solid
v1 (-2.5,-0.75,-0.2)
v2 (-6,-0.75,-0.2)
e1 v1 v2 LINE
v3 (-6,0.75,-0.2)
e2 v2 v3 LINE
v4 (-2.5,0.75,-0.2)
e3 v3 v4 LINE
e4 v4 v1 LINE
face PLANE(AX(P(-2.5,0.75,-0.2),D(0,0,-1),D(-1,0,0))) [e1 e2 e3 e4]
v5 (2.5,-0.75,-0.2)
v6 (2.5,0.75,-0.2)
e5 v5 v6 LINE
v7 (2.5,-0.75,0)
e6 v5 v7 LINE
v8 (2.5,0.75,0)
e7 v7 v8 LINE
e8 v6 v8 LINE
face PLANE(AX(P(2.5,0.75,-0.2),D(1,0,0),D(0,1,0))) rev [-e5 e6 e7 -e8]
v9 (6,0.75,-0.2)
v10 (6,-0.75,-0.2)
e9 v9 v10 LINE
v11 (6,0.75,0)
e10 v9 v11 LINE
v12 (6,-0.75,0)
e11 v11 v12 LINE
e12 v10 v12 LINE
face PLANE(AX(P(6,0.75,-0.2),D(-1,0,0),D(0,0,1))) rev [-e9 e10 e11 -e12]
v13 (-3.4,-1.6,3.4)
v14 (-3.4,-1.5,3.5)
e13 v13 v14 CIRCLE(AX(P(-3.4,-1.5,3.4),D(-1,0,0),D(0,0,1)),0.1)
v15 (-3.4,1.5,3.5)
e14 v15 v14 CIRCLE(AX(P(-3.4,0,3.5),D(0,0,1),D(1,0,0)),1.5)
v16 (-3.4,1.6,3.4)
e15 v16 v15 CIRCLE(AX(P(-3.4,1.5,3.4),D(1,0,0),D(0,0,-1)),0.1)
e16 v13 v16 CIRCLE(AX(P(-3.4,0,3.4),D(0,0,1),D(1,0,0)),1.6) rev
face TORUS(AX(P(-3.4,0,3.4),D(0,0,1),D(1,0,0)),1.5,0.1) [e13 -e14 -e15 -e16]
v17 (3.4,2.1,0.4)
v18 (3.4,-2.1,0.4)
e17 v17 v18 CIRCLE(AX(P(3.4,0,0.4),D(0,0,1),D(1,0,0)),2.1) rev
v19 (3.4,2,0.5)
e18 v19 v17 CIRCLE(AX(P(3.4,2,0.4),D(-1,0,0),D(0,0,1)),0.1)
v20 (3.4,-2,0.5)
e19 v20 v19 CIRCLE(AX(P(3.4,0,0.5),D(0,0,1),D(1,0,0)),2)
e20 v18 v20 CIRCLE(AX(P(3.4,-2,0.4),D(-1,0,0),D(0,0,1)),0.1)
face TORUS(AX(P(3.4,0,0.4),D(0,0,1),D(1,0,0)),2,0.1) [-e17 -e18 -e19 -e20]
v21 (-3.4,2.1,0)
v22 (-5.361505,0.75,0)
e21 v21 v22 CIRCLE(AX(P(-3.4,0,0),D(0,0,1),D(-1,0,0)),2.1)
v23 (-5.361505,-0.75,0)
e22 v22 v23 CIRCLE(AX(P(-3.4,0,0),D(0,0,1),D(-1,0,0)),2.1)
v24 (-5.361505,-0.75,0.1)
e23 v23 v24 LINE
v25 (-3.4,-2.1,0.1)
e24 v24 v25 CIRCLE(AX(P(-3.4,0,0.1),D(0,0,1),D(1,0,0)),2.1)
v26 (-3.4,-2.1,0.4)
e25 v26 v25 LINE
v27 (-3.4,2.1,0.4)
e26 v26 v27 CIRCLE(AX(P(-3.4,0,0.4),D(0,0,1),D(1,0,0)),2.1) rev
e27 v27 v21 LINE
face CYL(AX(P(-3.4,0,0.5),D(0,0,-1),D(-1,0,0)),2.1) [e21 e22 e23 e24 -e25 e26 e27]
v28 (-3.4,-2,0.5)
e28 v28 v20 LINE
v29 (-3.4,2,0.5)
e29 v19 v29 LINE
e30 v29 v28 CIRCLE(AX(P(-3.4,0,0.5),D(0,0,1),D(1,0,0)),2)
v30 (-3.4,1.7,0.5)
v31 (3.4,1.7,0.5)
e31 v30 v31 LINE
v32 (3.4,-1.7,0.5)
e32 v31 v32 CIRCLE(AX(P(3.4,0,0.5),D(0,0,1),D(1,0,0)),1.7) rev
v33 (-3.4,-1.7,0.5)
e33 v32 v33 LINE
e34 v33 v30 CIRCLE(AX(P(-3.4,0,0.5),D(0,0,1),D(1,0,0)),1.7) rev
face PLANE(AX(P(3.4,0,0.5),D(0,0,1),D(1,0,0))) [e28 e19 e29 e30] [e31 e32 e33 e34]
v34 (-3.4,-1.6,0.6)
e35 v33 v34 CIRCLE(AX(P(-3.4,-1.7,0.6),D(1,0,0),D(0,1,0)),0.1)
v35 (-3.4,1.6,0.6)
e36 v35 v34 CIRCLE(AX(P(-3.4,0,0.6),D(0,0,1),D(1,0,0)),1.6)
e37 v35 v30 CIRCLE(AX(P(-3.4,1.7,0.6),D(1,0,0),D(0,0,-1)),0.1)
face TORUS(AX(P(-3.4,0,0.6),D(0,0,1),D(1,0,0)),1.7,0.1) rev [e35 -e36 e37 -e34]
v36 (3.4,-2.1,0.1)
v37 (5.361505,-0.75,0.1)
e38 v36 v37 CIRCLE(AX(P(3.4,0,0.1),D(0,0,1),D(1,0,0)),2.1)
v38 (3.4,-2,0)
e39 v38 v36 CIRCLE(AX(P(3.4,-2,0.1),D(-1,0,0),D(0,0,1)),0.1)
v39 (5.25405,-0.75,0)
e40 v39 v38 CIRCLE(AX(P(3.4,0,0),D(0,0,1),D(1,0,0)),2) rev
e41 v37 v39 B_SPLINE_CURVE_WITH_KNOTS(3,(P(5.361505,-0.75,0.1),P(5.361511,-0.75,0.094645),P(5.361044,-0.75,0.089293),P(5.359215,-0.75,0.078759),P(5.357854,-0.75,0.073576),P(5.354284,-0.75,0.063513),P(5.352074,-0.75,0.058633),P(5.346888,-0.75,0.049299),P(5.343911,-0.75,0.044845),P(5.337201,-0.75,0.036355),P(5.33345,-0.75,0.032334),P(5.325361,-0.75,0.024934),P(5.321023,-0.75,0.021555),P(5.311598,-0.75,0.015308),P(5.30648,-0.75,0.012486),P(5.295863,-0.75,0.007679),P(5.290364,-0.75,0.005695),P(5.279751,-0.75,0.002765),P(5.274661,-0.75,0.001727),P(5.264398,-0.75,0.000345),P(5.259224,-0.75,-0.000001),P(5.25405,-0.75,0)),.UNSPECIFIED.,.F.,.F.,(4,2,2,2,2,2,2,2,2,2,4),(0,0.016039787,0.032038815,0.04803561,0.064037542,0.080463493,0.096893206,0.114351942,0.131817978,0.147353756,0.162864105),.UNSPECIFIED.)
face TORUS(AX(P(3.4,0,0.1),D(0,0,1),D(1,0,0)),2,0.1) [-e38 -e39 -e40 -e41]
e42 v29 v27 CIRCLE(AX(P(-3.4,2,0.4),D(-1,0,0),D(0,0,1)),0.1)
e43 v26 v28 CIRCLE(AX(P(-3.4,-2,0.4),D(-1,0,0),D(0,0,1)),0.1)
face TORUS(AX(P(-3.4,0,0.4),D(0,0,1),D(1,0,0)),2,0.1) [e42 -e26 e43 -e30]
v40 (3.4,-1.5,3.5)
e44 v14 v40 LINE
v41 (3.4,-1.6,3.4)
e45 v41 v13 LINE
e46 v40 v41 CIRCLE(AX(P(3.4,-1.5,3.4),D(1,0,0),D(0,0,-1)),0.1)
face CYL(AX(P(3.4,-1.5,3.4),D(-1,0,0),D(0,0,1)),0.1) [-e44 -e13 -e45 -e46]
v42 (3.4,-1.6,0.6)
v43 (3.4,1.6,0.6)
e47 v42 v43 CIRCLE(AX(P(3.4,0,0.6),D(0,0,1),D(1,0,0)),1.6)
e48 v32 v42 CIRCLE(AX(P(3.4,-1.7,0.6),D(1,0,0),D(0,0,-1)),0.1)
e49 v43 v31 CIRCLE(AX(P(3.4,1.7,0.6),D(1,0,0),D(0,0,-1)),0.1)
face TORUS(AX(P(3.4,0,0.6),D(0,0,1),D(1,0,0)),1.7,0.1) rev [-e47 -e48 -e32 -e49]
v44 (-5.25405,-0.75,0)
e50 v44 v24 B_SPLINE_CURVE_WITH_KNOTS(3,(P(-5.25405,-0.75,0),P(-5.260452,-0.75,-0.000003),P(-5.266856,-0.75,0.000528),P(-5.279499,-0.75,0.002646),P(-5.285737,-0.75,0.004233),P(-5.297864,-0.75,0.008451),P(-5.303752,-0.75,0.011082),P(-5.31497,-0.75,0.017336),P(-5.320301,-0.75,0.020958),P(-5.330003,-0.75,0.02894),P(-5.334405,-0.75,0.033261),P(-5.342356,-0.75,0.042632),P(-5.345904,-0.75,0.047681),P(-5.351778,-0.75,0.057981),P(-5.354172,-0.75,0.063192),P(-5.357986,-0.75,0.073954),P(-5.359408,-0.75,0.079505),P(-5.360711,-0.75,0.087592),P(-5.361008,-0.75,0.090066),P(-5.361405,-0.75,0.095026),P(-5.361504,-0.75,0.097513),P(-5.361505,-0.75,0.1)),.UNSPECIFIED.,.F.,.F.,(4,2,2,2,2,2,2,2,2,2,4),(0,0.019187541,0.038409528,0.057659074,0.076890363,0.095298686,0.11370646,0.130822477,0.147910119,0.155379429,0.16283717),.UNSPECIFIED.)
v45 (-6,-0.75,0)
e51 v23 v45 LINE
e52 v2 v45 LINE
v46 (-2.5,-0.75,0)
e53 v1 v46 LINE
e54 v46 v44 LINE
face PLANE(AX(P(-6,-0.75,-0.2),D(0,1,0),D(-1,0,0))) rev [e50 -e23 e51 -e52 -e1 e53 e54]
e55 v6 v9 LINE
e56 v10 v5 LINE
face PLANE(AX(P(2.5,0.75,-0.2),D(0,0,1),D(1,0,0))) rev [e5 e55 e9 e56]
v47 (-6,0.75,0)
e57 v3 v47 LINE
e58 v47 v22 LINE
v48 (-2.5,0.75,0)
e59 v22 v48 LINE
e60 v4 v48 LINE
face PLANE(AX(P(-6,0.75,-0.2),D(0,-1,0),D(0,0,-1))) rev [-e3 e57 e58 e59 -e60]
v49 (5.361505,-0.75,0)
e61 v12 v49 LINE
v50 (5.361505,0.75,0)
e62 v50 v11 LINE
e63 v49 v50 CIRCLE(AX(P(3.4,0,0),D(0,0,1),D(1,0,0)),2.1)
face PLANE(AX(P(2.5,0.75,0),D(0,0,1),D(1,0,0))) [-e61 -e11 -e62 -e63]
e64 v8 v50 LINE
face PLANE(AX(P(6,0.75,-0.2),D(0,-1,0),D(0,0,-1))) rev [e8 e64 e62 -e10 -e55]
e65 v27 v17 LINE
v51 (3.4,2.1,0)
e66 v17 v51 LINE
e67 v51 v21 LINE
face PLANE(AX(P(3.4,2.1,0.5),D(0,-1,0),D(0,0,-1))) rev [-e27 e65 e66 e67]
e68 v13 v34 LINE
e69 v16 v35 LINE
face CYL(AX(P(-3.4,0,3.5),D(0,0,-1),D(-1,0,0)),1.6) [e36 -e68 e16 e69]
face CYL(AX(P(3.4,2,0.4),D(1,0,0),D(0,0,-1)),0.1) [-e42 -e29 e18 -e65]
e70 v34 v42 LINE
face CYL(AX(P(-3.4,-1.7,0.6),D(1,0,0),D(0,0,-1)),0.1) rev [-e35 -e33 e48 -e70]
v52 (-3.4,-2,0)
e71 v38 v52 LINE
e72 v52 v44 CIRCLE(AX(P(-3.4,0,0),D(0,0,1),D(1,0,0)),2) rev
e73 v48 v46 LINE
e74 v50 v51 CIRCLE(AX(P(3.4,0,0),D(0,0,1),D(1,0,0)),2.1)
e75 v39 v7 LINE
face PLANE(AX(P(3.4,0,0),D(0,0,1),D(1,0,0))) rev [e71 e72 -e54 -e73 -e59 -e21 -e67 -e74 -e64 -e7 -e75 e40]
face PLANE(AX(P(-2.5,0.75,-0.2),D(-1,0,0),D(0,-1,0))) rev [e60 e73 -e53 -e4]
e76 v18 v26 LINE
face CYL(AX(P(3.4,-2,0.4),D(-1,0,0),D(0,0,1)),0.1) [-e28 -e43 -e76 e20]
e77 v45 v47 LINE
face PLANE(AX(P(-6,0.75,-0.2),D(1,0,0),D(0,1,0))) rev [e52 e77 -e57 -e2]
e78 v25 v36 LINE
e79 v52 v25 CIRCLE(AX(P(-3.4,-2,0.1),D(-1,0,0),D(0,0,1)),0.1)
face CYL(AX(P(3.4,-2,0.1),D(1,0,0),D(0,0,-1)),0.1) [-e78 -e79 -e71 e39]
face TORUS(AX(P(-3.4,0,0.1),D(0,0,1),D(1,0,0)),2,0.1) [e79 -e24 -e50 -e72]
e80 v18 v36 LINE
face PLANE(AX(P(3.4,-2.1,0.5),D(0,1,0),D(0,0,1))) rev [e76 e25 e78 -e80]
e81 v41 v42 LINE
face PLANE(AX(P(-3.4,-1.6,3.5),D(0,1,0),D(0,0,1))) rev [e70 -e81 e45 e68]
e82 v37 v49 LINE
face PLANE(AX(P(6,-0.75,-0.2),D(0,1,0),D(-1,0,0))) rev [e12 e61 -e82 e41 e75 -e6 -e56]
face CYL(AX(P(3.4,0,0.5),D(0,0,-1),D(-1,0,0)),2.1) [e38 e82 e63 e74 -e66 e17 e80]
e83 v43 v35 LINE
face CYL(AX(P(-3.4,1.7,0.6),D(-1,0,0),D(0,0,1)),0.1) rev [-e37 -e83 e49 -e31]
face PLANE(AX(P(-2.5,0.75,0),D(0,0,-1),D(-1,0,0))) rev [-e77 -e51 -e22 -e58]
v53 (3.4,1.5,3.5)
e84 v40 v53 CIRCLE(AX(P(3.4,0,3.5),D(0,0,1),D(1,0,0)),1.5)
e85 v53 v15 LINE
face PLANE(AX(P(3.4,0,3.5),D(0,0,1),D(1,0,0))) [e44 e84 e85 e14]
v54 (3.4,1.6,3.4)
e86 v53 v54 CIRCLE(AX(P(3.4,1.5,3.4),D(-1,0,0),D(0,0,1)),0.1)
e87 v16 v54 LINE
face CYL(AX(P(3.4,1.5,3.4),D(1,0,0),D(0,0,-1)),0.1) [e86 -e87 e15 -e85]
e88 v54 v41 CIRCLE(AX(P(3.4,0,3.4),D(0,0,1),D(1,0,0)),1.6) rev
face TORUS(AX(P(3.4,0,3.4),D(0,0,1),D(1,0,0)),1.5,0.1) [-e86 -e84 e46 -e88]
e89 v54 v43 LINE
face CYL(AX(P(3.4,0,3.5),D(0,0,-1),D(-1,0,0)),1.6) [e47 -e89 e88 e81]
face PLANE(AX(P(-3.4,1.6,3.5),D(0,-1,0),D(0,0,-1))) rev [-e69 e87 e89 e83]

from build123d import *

# Parameters (mm, degrees)
EXTRUDE_1_DEPTH = 0.5
EXTRUDE_2_DEPTH = 3
SKETCH_3_W      = 3.5
SKETCH_3_H      = 1.5
EXTRUDE_3_DEPTH = 0.2
FILLET_1_R      = 0.1


with BuildPart() as part:
    # 草图1 → 凸台-拉伸1 (new body)
    with BuildSketch(Plane.XY):
        with BuildLine():
            Line((3.4, 2.1), (-3.4, 2.1))
            ThreePointArc((-3.4, 2.1), (-5.5, 0), (-3.4, -2.1))
            Line((-3.4, -2.1), (3.4, -2.1))
            ThreePointArc((3.4, -2.1), (5.5, 0), (3.4, 2.1))
        make_face()
    extrude(amount=EXTRUDE_1_DEPTH)

    # 草图2 → 凸台-拉伸2 (add)
    with BuildSketch(Plane.XY.offset(0.5)):
        with BuildLine():
            Line((-3.4, 1.6), (3.4, 1.6))
            ThreePointArc((3.4, 1.6), (5, 0), (3.4, -1.6))
            Line((3.4, -1.6), (-3.4, -1.6))
            ThreePointArc((-3.4, -1.6), (-5, 0), (-3.4, 1.6))
        make_face()
    extrude(amount=EXTRUDE_2_DEPTH)

    # 草图3 → 凸台-拉伸3 (add)
    with BuildSketch(Plane(origin=(0, 0, 0), x_dir=(-1, 0, 0), z_dir=(0, 0, -1))):
        with Locations((-4.25, 0)):
            Rectangle(SKETCH_3_W, SKETCH_3_H)
        with Locations((4.25, 0)):
            Rectangle(SKETCH_3_W, SKETCH_3_H)
    extrude(amount=EXTRUDE_3_DEPTH)

    # 圆角1
    # the kernel refuses this fillet: 0.1 mm, written as the material it adds along each edge
    with BuildSketch(Plane(origin=(3.4, 0, 0.5), x_dir=(0, 1, 0), z_dir=(-1, 0, 0))) as fillet_1_piece_1:
        with BuildLine():
            CenterArc((1.6 + FILLET_1_R, -FILLET_1_R), FILLET_1_R, 90, 90)
            Line((1.6, -FILLET_1_R), (1.6, 0))
            Line((1.6, 0), (1.6 + FILLET_1_R, 0))
        make_face()
    revolve(axis=Axis((3.4, 0, 0.5), (0, 0, -1)), revolution_arc=180)
    with BuildSketch(Plane(origin=(-3.4, 1.6, 0.5), x_dir=(0, 1, 0), z_dir=(1, 0, 0)), Plane(origin=(3.4, -1.6, 0.5), x_dir=(0, -1, 0), z_dir=(-1, 0, 0))) as fillet_1_piece_2:
        with BuildLine():
            CenterArc((FILLET_1_R, FILLET_1_R), FILLET_1_R, 180, 90)
            Line((0, FILLET_1_R), (0, 0))
            Line((0, 0), (FILLET_1_R, 0))
        make_face()
    extrude(amount=6.8)
    with BuildSketch(Plane(origin=(-3.4, 0, 0.5), x_dir=(0, -1, 0), z_dir=(1, 0, 0))) as fillet_1_piece_3:
        with BuildLine():
            CenterArc((1.6 + FILLET_1_R, -FILLET_1_R), FILLET_1_R, 90, 90)
            Line((1.6, -FILLET_1_R), (1.6, 0))
            Line((1.6, 0), (1.6 + FILLET_1_R, 0))
        make_face()
    revolve(axis=Axis((-3.4, 0, 0.5), (0, 0, -1)), revolution_arc=180)
    # the kernel refuses this fillet: 0.1 mm, written as the material it takes off along each edge
    with BuildSketch(Plane(origin=(-3.4, 0, 0.5), x_dir=(0, 1, 0), z_dir=(1, 0, 0))) as fillet_1_2_piece_1:
        with BuildLine():
            CenterArc((2.1 - FILLET_1_R, -FILLET_1_R), FILLET_1_R, 0, 90)
            Line((2.1 - FILLET_1_R, 0), (2.1, 0))
            Line((2.1, 0), (2.1, -FILLET_1_R))
        make_face()
    revolve(axis=Axis((-3.4, 0, 0.5), (0, 0, 1)), revolution_arc=180, mode=Mode.SUBTRACT)
    with BuildSketch(Plane(origin=(-3.4, -2.1, 0.5), x_dir=(0, 1, 0), z_dir=(1, 0, 0)), Plane(origin=(-3.4, 1.6, 3.5), x_dir=(0, 0, -1), z_dir=(1, 0, 0)), Plane(origin=(3.4, -1.6, 3.5), x_dir=(0, 0, -1), z_dir=(-1, 0, 0))) as fillet_1_2_piece_2:
        with BuildLine():
            CenterArc((FILLET_1_R, -FILLET_1_R), FILLET_1_R, 90, 90)
            Line((0, -FILLET_1_R), (0, 0))
            Line((0, 0), (FILLET_1_R, 0))
        make_face()
    extrude(amount=6.8, mode=Mode.SUBTRACT)
    with BuildSketch(Plane(origin=(3.4, 0, 3.5), x_dir=(0, 1, 0), z_dir=(-1, 0, 0))) as fillet_1_2_piece_3:
        with BuildLine():
            CenterArc((1.6 - FILLET_1_R, FILLET_1_R), FILLET_1_R, 270, 90)
            Line((1.6 - FILLET_1_R, 0), (1.6, 0))
            Line((1.6, 0), (1.6, FILLET_1_R))
        make_face()
    revolve(axis=Axis((3.4, 0, 3.5), (0, 0, -1)), revolution_arc=180, mode=Mode.SUBTRACT)
    with BuildSketch(Plane(origin=(-3.4, 0, 3.5), x_dir=(0, -1, 0), z_dir=(1, 0, 0))) as fillet_1_2_piece_4:
        with BuildLine():
            CenterArc((1.6 - FILLET_1_R, FILLET_1_R), FILLET_1_R, 270, 90)
            Line((1.6 - FILLET_1_R, 0), (1.6, 0))
            Line((1.6, 0), (1.6, FILLET_1_R))
        make_face()
    revolve(axis=Axis((-3.4, 0, 3.5), (0, 0, -1)), revolution_arc=180, mode=Mode.SUBTRACT)
    with BuildSketch(Plane(origin=(-3.4, 0, 0), x_dir=(-0.9698622672900031, -0.2436538168941636, 0), z_dir=(-0.2436538168941636, 0.9698622672900031, 0))) as fillet_1_2_piece_5_section:
        with BuildLine():
            CenterArc((2.1 - FILLET_1_R, FILLET_1_R), FILLET_1_R, 270, 90)
            Line((2.1 - FILLET_1_R, 0), (2.1, 0))
            Line((2.1, 0), (2.1, FILLET_1_R))
        make_face()
    fillet_1_2_piece_5 = revolve(axis=Axis((-3.4, 0, 0), (0, 0, 1)), revolution_arc=75.897707553, mode=Mode.PRIVATE)
    fillet_1_2_piece_5 = split(fillet_1_2_piece_5, bisect_by=Plane(origin=(-4.574684064, -0.75, 0.028052066), z_dir=(0, -1, 0)), keep=Keep.TOP, mode=Mode.PRIVATE)
    add(fillet_1_2_piece_5, mode=Mode.SUBTRACT)
    with BuildSketch(Plane(origin=(3.4, 0, 0.5), x_dir=(0, -1, 0), z_dir=(-1, 0, 0))) as fillet_1_2_piece_6:
        with BuildLine():
            CenterArc((2.1 - FILLET_1_R, -FILLET_1_R), FILLET_1_R, 0, 90)
            Line((2.1 - FILLET_1_R, 0), (2.1, 0))
            Line((2.1, 0), (2.1, -FILLET_1_R))
        make_face()
    revolve(axis=Axis((3.4, 0, 0.5), (0, 0, 1)), revolution_arc=180, mode=Mode.SUBTRACT)
    with BuildSketch(Plane(origin=(-3.4, -2.1, 0), x_dir=(0, 1, 0), z_dir=(1, 0, 0)), Plane(origin=(3.4, 2.1, 0.5), x_dir=(0, 0, -1), z_dir=(-1, 0, 0))) as fillet_1_2_piece_7:
        with BuildLine():
            CenterArc((FILLET_1_R, FILLET_1_R), FILLET_1_R, 180, 90)
            Line((0, FILLET_1_R), (0, 0))
            Line((0, 0), (FILLET_1_R, 0))
        make_face()
    extrude(amount=6.8, mode=Mode.SUBTRACT)
    with BuildSketch(Plane(origin=(3.4, 0, 0), x_dir=(0, -1, 0), z_dir=(-1, 0, 0))) as fillet_1_2_piece_8_section:
        with BuildLine():
            CenterArc((2.1 - FILLET_1_R, FILLET_1_R), FILLET_1_R, 270, 90)
            Line((2.1 - FILLET_1_R, 0), (2.1, 0))
            Line((2.1, 0), (2.1, FILLET_1_R))
        make_face()
    fillet_1_2_piece_8 = revolve(axis=Axis((3.4, 0, 0), (0, 0, 1)), revolution_arc=75.897707553, mode=Mode.PRIVATE)
    fillet_1_2_piece_8 = split(fillet_1_2_piece_8, bisect_by=Plane(origin=(4.574684074, -0.75, 0.028052047), z_dir=(0, -1, 0)), keep=Keep.TOP, mode=Mode.PRIVATE)
    add(fillet_1_2_piece_8, mode=Mode.SUBTRACT)


solid = part.part
